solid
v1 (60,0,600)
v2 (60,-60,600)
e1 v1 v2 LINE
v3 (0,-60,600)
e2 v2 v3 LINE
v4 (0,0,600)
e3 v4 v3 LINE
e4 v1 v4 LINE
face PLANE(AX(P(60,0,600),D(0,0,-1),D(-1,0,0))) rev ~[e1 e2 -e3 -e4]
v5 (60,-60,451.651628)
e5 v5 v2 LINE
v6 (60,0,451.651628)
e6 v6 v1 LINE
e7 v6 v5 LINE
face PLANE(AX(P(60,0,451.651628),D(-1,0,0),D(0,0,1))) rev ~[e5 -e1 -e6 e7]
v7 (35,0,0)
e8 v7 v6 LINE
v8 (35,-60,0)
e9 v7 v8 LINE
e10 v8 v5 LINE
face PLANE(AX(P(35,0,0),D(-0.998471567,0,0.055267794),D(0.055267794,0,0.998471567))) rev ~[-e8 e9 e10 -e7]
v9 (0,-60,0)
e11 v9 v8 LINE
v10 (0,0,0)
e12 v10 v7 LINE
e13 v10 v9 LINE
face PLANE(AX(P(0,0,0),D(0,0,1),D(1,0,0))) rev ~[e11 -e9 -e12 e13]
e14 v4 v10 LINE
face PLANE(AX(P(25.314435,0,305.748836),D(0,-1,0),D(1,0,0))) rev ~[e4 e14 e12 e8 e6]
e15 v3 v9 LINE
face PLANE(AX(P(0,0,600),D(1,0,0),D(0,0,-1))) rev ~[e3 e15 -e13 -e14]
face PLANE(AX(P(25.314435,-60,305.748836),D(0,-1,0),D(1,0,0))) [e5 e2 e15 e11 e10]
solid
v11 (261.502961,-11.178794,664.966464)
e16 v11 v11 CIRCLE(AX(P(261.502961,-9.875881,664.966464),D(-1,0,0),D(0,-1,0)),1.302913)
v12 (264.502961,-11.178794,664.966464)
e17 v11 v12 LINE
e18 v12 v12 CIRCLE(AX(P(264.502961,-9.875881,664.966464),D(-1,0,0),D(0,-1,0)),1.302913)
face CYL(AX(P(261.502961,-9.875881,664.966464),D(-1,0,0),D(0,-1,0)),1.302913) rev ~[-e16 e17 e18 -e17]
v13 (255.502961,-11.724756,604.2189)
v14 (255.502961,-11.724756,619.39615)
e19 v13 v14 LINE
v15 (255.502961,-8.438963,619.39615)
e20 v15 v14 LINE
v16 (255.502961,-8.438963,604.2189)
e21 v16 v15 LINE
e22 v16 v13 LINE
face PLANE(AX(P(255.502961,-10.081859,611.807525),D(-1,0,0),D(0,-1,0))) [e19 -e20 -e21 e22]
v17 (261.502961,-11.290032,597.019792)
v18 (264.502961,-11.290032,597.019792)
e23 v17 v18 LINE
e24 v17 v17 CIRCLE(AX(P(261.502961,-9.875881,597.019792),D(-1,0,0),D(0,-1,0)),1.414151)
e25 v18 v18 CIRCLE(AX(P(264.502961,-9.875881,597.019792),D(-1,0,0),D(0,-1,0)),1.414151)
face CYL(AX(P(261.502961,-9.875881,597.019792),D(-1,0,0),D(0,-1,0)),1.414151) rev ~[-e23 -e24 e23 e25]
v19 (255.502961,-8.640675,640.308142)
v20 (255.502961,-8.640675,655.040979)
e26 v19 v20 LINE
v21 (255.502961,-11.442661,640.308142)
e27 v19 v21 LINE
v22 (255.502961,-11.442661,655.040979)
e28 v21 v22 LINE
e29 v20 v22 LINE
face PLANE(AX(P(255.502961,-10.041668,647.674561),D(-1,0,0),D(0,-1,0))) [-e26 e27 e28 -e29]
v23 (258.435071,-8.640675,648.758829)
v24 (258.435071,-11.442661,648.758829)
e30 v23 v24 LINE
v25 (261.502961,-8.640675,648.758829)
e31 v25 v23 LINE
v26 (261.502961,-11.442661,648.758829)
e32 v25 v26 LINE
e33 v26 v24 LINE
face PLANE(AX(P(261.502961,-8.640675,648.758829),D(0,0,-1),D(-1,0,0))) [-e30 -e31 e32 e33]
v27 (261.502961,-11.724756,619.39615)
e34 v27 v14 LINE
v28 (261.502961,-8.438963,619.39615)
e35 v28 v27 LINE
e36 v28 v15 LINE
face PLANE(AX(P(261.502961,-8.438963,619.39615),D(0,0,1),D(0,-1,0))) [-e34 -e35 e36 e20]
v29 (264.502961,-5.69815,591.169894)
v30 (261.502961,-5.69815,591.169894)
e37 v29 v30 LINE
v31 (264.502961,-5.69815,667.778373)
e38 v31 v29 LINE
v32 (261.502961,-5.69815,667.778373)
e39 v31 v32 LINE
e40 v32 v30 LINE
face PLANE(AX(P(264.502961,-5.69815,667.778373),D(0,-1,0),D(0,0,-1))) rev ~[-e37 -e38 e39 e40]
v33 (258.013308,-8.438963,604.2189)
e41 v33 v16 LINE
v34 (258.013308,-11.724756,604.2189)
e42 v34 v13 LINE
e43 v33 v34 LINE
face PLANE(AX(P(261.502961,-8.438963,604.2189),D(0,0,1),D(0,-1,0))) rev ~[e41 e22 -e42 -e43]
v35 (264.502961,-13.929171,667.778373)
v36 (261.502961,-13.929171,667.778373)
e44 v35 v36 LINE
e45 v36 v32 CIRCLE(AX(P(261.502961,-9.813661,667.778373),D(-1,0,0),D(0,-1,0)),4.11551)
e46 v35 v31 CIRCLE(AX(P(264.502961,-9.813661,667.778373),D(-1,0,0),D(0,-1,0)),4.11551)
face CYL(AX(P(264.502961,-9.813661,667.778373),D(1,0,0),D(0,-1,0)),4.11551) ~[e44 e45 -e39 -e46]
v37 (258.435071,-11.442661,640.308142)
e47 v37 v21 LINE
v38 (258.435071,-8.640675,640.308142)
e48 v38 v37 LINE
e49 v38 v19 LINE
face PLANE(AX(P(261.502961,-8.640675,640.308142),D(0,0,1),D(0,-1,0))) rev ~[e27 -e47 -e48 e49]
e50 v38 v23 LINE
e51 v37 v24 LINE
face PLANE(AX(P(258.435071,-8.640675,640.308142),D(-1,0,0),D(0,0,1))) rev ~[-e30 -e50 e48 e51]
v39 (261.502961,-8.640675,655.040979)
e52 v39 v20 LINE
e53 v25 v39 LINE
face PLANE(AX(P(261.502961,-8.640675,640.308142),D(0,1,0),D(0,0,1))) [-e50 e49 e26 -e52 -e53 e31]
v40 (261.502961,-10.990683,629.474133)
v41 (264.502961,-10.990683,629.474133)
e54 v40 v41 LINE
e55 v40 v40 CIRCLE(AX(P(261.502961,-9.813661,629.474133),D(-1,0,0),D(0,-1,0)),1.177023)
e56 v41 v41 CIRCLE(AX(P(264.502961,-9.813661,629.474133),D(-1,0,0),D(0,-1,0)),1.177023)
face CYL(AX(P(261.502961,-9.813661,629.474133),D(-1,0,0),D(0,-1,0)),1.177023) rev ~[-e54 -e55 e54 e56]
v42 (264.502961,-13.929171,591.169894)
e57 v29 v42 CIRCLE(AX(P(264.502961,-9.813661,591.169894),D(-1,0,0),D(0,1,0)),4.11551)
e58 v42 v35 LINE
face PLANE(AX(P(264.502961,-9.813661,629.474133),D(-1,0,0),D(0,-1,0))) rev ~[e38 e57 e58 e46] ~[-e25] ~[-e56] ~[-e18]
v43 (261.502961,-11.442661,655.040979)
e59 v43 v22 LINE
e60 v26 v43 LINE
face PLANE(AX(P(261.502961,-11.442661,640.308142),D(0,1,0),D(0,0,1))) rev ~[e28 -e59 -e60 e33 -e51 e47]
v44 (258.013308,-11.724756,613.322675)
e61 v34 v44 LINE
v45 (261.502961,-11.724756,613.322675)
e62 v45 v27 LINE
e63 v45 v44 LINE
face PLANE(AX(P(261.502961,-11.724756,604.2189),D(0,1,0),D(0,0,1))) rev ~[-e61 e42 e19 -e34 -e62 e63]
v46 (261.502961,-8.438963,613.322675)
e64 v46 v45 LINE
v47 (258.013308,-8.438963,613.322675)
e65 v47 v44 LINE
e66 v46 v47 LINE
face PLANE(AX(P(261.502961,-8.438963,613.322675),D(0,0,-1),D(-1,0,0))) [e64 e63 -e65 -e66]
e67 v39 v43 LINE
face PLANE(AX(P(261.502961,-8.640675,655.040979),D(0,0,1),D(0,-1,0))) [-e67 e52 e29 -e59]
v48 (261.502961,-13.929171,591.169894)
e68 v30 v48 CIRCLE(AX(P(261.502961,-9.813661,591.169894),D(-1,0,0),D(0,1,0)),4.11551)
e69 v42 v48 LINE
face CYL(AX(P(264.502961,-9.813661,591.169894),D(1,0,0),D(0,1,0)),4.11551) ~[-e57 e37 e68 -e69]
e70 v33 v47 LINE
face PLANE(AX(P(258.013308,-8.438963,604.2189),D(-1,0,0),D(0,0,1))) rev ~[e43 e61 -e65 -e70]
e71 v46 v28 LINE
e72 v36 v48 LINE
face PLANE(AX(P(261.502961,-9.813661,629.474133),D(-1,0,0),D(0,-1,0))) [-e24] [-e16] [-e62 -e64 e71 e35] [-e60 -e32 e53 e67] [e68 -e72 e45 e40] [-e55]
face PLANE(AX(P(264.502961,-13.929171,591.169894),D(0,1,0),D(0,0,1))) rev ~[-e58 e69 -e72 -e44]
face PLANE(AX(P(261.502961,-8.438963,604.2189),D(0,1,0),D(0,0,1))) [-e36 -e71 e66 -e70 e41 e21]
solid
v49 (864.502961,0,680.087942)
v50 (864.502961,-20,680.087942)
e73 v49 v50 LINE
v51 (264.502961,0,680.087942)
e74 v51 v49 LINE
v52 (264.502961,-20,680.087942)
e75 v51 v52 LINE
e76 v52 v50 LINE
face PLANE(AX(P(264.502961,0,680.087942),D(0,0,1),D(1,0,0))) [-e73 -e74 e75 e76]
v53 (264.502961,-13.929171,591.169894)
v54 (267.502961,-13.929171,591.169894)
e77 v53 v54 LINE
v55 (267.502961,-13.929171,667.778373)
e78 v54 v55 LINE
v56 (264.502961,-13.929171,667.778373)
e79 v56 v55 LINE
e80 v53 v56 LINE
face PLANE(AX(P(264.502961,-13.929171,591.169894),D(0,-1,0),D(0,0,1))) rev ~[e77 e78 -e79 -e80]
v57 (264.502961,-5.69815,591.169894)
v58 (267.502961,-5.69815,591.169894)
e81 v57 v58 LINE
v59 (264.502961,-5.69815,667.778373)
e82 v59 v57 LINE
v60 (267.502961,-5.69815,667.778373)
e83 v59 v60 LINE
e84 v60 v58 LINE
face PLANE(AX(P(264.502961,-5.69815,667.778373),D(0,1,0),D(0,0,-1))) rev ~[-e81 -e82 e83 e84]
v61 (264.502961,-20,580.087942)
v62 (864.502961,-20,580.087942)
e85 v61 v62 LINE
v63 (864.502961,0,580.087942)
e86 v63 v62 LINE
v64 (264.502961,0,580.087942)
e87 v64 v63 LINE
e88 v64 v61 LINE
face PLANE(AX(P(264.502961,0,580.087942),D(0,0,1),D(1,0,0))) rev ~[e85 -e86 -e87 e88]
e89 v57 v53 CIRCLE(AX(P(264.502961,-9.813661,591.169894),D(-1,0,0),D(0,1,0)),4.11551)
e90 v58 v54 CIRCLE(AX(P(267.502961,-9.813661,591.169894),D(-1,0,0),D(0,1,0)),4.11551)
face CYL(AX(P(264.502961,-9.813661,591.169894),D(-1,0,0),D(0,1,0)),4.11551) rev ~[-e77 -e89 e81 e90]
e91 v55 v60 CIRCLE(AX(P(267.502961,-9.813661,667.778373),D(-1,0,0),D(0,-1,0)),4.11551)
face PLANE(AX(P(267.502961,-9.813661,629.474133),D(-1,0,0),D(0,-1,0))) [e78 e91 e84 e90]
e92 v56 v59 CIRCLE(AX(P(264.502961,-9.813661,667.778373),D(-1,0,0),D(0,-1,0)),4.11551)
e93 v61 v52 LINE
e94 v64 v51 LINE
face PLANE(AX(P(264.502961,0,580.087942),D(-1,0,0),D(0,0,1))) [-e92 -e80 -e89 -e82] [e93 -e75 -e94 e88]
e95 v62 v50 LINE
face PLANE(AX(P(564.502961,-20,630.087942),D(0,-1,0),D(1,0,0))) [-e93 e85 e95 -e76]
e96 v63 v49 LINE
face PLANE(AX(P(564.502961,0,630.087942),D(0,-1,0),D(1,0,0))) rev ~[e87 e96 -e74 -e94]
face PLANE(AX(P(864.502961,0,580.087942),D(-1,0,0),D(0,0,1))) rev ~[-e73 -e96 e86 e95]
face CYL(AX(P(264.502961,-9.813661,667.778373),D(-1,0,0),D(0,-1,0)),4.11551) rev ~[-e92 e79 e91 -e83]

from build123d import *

# Parameters (mm, degrees)
F1_DEPTH  = 60
F3_W      = 600
F3_H      = 100
F4_DEPTH  = 20
F6_DEPTH  = 3
F7_DEPTH  = 3
F8_R      = 1.4141506132
F8_R_2    = 1.3029129936
F8_R_3    = 1.1770229145
F9_DEPTH  = 15
F10_W     = 2.8019864112
F10_H     = 14.732837677
F11_DEPTH = 6
F10_W_2   = 3.2857935876
F10_H_2   = 15.1772499084
F12_DEPTH = 6
F13_W     = 3.067890475
F13_H     = 8.4506869316
F14_DEPTH = 25.4
F15_W     = 3.4896529414
F15_H     = 9.1037750244
F16_DEPTH = 25.4


with BuildPart() as f1:
    # F0 (on Front) → F1 (new body)
    with BuildSketch(Plane.XZ):
        Polygon((0, 600), (0, 0), (35, 0), (60, 451.6516281811), (60, 600), align=None)
    extrude(amount=F1_DEPTH)


with BuildPart() as f4:
    # F3 (on face) → F4 (new body)
    with BuildSketch(Plane.XZ):
        with Locations((564.5029609896, 630.087941885)):
            Rectangle(F3_W, F3_H)
    extrude(amount=F4_DEPTH)

    # F5 (on face) → F6 (cut)
    with BuildSketch(Plane(origin=(264.5029609896, 0, 0), x_dir=(0, -1, 0), z_dir=(-1, 0, 0))):
        with BuildLine():
            ThreePointArc((13.9291705564, 667.7783727646), (9.8136605229, 671.893882798), (5.6981504895, 667.7783727646))
            Line((5.6981504895, 667.7783727646), (5.6981504895, 591.1698937416))
            ThreePointArc((5.6981504895, 591.1698937416), (9.8136605229, 587.0543837082), (13.9291705564, 591.1698937416))
            Line((13.9291705564, 591.1698937416), (13.9291705564, 667.7783727646))
        make_face()
    extrude(amount=-F6_DEPTH, mode=Mode.SUBTRACT)


with BuildPart() as f7:
    # F5 (on face) → F7 (new body)
    with BuildSketch(Plane(origin=(264.5029609896, 0, 0), x_dir=(0, -1, 0), z_dir=(-1, 0, 0))):
        with BuildLine():
            ThreePointArc((13.9291705564, 667.7783727646), (9.8136605229, 671.893882798), (5.6981504895, 667.7783727646))
            Line((5.6981504895, 667.7783727646), (5.6981504895, 591.1698937416))
            ThreePointArc((5.6981504895, 591.1698937416), (9.8136605229, 587.0543837082), (13.9291705564, 591.1698937416))
            Line((13.9291705564, 591.1698937416), (13.9291705564, 667.7783727646))
        make_face()
    extrude(amount=F7_DEPTH)

    # F8 (on face) → F9 (cut)
    with BuildSketch(Plane(origin=(261.5029609896, 0, 0), x_dir=(0, -1, 0), z_dir=(-1, 0, 0))):
        with Locations((9.8758814856, 597.0197916031)):
            Circle(F8_R)
        with Locations((9.8758814856, 664.9664640427)):
            Circle(F8_R_2)
        with Locations((9.8136605229, 629.4741332531)):
            Circle(F8_R_3)
    extrude(amount=-F9_DEPTH, mode=Mode.SUBTRACT)

    # F10 (on face) → F11 (join)
    with BuildSketch(Plane(origin=(261.5029609896, 0, 0), x_dir=(0, -1, 0), z_dir=(-1, 0, 0))):
        with Locations((10.0416680798, 647.6745605469)):
            Rectangle(F10_W, F10_H)
    extrude(amount=F11_DEPTH)

    # F10 (on face) → F12 (join)
    with BuildSketch(Plane(origin=(261.5029609896, 0, 0), x_dir=(0, -1, 0), z_dir=(-1, 0, 0))):
        with Locations((10.0818593055, 611.8075251579)):
            Rectangle(F10_W_2, F10_H_2)
    extrude(amount=F12_DEPTH)

    # F13 (on face) → F14 (cut)
    with BuildSketch(Plane(origin=(0, -8.6406748742, 0), x_dir=(-1, 0, 0), z_dir=(0, 1, 0))):
        with Locations((-259.9690157522, 644.5334851742)):
            Rectangle(F13_W, F13_H)
    extrude(amount=-F14_DEPTH, mode=Mode.SUBTRACT)

    # F15 (on face) → F16 (cut)
    with BuildSketch(Plane(origin=(0, -8.4389625117, 0), x_dir=(-1, 0, 0), z_dir=(0, 1, 0))):
        with Locations((-259.7581345189, 608.7707877159)):
            Rectangle(F15_W, F15_H)
    extrude(amount=-F16_DEPTH, mode=Mode.SUBTRACT)


solid = Compound([f1.part, f4.part, f7.part])
